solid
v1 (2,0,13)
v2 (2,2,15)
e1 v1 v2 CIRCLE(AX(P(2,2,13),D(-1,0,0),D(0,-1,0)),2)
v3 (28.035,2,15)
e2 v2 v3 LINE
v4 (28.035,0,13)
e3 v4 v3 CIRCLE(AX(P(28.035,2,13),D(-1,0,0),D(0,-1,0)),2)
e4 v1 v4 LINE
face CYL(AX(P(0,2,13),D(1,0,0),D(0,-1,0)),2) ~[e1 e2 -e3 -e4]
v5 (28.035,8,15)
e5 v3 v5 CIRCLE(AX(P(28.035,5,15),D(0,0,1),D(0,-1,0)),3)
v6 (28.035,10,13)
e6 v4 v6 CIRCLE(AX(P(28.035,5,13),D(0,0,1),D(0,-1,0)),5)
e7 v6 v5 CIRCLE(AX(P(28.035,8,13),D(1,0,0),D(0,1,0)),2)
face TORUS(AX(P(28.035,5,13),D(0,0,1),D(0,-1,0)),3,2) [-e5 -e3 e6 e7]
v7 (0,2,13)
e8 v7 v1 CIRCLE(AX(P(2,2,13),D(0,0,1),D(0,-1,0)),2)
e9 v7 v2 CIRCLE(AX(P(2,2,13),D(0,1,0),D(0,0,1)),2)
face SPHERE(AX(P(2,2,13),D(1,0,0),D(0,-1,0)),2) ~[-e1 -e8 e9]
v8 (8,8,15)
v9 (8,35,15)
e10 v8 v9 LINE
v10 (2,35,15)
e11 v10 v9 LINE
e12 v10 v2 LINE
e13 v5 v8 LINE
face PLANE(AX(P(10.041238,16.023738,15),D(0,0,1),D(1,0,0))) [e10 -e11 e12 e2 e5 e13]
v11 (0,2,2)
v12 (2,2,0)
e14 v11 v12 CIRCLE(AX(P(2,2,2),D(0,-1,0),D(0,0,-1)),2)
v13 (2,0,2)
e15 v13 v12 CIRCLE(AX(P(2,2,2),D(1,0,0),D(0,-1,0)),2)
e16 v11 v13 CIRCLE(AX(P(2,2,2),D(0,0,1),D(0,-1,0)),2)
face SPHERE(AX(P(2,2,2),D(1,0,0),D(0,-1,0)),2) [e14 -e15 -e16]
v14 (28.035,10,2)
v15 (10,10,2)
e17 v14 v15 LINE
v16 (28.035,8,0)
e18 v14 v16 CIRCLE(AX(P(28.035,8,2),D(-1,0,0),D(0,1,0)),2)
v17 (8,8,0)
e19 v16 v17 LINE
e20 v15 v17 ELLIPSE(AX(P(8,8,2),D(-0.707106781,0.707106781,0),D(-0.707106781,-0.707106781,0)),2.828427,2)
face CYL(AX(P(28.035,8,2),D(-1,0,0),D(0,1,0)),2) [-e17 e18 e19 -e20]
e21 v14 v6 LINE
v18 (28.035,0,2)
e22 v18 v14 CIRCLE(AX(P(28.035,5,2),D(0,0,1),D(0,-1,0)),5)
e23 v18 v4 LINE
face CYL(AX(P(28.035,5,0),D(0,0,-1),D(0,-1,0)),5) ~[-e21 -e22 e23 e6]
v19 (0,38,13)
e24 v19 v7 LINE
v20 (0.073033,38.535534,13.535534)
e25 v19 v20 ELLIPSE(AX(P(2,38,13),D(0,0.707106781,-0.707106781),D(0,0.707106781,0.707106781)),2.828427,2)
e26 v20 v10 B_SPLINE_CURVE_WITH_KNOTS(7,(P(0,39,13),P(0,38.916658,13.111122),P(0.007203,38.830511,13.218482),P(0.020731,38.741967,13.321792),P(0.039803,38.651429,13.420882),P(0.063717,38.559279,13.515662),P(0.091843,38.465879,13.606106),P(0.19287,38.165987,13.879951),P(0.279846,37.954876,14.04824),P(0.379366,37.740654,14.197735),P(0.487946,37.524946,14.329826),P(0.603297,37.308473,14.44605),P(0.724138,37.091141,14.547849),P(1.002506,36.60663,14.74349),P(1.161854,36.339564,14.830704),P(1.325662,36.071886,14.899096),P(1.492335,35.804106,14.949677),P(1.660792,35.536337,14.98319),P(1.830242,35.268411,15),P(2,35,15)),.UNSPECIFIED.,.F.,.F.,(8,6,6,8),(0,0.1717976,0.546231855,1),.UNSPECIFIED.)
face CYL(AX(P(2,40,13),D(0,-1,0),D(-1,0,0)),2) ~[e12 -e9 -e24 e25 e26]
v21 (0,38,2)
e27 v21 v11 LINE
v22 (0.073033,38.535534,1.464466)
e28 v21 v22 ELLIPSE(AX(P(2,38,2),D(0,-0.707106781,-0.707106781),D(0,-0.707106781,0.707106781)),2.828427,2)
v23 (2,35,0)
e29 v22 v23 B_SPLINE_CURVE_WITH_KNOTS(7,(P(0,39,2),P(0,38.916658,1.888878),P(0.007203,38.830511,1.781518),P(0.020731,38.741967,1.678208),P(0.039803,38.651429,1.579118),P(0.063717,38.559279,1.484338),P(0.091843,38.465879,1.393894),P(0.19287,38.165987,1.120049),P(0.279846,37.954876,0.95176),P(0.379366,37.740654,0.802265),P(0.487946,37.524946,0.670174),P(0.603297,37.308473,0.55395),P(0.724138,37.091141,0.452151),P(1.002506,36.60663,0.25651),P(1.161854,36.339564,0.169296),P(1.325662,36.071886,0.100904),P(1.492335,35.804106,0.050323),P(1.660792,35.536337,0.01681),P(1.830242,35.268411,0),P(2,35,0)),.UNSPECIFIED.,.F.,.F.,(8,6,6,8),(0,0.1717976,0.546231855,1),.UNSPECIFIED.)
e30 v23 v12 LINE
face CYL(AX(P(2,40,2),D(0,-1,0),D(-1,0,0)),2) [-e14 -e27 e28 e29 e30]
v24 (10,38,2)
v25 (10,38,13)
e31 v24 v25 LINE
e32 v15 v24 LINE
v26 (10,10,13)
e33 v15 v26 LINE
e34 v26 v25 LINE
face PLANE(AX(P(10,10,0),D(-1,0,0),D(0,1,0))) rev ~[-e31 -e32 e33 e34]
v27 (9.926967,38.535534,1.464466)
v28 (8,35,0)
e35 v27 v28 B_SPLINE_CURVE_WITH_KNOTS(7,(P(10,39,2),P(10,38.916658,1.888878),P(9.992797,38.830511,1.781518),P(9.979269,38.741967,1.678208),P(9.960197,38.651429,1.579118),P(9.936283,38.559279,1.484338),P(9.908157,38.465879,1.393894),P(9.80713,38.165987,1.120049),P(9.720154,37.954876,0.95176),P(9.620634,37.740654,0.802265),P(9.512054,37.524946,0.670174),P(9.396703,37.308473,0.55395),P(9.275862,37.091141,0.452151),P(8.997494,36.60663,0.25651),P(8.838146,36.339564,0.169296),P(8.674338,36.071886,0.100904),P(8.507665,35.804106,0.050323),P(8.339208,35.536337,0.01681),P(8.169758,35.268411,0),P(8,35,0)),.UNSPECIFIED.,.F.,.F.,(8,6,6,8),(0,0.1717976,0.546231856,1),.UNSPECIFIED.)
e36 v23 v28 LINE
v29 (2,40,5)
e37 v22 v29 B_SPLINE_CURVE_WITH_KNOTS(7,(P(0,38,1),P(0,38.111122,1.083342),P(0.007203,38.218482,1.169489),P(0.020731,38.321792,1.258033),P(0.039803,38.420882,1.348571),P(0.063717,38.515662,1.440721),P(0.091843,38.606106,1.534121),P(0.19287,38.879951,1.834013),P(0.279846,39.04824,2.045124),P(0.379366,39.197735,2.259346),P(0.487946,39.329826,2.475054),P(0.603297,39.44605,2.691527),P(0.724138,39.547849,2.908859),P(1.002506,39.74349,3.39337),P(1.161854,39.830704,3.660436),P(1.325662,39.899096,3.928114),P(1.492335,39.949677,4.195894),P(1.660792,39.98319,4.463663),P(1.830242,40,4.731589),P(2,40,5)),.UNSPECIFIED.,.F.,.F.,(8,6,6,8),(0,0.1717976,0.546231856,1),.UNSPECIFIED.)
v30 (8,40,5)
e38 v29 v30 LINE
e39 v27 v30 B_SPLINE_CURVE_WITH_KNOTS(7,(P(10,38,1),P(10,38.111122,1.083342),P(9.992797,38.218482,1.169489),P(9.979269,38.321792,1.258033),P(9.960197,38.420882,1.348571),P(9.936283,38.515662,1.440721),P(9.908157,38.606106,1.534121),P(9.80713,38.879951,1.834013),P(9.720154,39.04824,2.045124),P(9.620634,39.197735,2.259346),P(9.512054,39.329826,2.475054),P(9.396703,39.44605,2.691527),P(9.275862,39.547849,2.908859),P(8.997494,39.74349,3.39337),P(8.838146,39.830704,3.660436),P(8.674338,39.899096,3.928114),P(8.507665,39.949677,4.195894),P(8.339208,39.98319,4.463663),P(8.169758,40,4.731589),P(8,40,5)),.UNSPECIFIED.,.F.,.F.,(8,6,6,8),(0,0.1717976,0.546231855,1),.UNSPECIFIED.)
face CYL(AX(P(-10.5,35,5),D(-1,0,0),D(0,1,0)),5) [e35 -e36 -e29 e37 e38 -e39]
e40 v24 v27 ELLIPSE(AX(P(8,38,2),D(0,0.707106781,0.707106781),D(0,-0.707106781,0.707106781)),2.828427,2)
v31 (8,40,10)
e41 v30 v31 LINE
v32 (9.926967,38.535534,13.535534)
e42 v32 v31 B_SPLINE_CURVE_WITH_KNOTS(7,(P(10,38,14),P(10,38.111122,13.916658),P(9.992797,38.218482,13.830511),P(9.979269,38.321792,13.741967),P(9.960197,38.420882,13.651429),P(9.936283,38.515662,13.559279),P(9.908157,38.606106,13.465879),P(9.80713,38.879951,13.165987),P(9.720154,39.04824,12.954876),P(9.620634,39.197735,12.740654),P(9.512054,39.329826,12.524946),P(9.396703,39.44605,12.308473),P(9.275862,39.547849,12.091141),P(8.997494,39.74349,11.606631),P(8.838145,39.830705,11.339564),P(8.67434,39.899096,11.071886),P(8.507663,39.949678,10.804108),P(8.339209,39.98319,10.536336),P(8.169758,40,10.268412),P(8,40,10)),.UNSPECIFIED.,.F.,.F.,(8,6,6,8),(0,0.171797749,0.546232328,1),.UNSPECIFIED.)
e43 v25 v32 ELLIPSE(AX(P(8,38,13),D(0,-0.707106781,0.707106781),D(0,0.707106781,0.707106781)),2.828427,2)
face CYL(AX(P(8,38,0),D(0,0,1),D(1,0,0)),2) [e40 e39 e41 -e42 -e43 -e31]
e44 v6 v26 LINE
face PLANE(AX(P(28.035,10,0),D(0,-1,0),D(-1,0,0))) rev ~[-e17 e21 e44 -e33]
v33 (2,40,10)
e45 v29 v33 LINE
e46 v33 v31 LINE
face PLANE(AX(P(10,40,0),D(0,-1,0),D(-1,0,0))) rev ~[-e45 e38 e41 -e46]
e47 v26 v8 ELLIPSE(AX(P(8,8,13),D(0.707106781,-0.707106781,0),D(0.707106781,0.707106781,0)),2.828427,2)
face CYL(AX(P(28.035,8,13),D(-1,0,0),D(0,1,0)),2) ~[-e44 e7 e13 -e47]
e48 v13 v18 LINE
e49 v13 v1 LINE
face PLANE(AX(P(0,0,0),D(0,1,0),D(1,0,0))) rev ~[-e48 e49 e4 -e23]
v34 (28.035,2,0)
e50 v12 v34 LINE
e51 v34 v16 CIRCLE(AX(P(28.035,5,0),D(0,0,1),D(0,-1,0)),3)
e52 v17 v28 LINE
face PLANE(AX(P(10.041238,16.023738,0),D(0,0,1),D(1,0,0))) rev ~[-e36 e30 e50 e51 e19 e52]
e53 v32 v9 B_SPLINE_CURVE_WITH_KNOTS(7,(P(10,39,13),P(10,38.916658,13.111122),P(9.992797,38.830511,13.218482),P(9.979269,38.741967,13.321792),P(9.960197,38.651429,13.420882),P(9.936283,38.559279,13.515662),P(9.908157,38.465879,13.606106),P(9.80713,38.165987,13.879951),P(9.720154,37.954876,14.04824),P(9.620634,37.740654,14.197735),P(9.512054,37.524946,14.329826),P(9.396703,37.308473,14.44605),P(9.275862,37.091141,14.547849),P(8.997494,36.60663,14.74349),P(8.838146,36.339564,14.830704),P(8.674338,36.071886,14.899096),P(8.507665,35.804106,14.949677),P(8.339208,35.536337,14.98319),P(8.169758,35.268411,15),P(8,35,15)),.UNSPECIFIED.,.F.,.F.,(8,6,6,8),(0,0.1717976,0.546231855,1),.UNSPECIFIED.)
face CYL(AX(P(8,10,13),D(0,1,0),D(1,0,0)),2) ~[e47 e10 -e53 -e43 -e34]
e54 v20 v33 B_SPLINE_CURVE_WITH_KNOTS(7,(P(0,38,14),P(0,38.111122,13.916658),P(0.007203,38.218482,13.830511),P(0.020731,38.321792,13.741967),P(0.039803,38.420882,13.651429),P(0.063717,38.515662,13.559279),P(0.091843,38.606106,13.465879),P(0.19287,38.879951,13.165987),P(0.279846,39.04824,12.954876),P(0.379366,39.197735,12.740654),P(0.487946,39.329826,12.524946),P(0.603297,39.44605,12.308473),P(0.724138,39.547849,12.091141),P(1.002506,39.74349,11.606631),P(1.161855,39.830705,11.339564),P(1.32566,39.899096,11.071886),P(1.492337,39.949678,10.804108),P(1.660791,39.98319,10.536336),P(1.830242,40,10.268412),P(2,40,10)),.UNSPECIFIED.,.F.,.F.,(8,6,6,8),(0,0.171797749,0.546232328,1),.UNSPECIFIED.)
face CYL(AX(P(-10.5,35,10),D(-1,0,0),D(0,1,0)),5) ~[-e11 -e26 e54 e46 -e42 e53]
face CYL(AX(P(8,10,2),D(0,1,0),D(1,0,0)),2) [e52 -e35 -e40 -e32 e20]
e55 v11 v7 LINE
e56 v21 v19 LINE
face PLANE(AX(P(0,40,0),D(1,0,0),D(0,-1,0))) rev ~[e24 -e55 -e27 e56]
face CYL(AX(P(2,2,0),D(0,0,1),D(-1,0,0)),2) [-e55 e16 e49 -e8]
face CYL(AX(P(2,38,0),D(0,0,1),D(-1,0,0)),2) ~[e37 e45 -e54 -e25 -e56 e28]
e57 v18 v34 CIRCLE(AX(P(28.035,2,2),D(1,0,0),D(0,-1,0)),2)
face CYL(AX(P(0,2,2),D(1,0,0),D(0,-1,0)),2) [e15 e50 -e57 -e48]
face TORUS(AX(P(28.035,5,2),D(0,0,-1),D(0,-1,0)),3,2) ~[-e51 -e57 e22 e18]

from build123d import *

# Parameters (mm, degrees)
F1_DEPTH    = 15
F2_R        = 2
F3_T1_DEPTH = 31


# Not quite as in the source:
# - a fillet or chamfer that OpenCascade refuses, or shapes differently, is made with other operations: its cross-section is extruded or revolved along the edge and cut away or added


with BuildPart() as f1:
    # F0 (on Top) → F1 (new body)
    with BuildSketch(Plane.XY):
        Polygon((0, 40), (0, 0), (28.0349999666, 0), (28.0349999666, 10), (10, 10), (10, 40), align=None)
        with BuildLine():
            Line((28.0349999666, 10), (28.0349999666, 0))
            ThreePointArc((28.0349999666, 0), (33.0349999666, 5), (28.0349999666, 10))
        make_face()
    extrude(amount=F1_DEPTH)

    # F2
    f2_edges = [f1.edges().sort_by_distance(p)[0] for p in [
        (10, 25, 15),
        (19.0175, 10, 15),
        (14.0175, 0, 0),
        (10, 40, 7.5),
        (0, 40, 7.5),
        (0, 0, 7.5),
        (0, 20, 0),
        (0, 20, 15),
        (10, 25, 0),
        (14.0175, 0, 15),
        (33.035, 5, 0),
        (33.035, 5, 15),
        (19.0175, 10, 0),
    ]]
    fillet(f2_edges, radius=F2_R)

    # F3: fillet of radius 5 on 4 edges, made by hand

    # F3_s2 → F3_t1 (cut)
    with BuildSketch(Plane.YZ.offset(-10.5)):
        with BuildLine():
            ThreePointArc((40, 5), (38.5355339059, 1.4644660941), (35, 0))
            Line((35, 0), (40, 0))
            Line((40, 0), (40, 5))
        make_face()
        with BuildLine():
            ThreePointArc((40, 10), (38.5355339059, 13.5355339059), (35, 15))
            Line((35, 15), (40, 15))
            Line((40, 15), (40, 10))
        make_face()
    extrude(amount=F3_T1_DEPTH, mode=Mode.SUBTRACT)


solid = f1.part
